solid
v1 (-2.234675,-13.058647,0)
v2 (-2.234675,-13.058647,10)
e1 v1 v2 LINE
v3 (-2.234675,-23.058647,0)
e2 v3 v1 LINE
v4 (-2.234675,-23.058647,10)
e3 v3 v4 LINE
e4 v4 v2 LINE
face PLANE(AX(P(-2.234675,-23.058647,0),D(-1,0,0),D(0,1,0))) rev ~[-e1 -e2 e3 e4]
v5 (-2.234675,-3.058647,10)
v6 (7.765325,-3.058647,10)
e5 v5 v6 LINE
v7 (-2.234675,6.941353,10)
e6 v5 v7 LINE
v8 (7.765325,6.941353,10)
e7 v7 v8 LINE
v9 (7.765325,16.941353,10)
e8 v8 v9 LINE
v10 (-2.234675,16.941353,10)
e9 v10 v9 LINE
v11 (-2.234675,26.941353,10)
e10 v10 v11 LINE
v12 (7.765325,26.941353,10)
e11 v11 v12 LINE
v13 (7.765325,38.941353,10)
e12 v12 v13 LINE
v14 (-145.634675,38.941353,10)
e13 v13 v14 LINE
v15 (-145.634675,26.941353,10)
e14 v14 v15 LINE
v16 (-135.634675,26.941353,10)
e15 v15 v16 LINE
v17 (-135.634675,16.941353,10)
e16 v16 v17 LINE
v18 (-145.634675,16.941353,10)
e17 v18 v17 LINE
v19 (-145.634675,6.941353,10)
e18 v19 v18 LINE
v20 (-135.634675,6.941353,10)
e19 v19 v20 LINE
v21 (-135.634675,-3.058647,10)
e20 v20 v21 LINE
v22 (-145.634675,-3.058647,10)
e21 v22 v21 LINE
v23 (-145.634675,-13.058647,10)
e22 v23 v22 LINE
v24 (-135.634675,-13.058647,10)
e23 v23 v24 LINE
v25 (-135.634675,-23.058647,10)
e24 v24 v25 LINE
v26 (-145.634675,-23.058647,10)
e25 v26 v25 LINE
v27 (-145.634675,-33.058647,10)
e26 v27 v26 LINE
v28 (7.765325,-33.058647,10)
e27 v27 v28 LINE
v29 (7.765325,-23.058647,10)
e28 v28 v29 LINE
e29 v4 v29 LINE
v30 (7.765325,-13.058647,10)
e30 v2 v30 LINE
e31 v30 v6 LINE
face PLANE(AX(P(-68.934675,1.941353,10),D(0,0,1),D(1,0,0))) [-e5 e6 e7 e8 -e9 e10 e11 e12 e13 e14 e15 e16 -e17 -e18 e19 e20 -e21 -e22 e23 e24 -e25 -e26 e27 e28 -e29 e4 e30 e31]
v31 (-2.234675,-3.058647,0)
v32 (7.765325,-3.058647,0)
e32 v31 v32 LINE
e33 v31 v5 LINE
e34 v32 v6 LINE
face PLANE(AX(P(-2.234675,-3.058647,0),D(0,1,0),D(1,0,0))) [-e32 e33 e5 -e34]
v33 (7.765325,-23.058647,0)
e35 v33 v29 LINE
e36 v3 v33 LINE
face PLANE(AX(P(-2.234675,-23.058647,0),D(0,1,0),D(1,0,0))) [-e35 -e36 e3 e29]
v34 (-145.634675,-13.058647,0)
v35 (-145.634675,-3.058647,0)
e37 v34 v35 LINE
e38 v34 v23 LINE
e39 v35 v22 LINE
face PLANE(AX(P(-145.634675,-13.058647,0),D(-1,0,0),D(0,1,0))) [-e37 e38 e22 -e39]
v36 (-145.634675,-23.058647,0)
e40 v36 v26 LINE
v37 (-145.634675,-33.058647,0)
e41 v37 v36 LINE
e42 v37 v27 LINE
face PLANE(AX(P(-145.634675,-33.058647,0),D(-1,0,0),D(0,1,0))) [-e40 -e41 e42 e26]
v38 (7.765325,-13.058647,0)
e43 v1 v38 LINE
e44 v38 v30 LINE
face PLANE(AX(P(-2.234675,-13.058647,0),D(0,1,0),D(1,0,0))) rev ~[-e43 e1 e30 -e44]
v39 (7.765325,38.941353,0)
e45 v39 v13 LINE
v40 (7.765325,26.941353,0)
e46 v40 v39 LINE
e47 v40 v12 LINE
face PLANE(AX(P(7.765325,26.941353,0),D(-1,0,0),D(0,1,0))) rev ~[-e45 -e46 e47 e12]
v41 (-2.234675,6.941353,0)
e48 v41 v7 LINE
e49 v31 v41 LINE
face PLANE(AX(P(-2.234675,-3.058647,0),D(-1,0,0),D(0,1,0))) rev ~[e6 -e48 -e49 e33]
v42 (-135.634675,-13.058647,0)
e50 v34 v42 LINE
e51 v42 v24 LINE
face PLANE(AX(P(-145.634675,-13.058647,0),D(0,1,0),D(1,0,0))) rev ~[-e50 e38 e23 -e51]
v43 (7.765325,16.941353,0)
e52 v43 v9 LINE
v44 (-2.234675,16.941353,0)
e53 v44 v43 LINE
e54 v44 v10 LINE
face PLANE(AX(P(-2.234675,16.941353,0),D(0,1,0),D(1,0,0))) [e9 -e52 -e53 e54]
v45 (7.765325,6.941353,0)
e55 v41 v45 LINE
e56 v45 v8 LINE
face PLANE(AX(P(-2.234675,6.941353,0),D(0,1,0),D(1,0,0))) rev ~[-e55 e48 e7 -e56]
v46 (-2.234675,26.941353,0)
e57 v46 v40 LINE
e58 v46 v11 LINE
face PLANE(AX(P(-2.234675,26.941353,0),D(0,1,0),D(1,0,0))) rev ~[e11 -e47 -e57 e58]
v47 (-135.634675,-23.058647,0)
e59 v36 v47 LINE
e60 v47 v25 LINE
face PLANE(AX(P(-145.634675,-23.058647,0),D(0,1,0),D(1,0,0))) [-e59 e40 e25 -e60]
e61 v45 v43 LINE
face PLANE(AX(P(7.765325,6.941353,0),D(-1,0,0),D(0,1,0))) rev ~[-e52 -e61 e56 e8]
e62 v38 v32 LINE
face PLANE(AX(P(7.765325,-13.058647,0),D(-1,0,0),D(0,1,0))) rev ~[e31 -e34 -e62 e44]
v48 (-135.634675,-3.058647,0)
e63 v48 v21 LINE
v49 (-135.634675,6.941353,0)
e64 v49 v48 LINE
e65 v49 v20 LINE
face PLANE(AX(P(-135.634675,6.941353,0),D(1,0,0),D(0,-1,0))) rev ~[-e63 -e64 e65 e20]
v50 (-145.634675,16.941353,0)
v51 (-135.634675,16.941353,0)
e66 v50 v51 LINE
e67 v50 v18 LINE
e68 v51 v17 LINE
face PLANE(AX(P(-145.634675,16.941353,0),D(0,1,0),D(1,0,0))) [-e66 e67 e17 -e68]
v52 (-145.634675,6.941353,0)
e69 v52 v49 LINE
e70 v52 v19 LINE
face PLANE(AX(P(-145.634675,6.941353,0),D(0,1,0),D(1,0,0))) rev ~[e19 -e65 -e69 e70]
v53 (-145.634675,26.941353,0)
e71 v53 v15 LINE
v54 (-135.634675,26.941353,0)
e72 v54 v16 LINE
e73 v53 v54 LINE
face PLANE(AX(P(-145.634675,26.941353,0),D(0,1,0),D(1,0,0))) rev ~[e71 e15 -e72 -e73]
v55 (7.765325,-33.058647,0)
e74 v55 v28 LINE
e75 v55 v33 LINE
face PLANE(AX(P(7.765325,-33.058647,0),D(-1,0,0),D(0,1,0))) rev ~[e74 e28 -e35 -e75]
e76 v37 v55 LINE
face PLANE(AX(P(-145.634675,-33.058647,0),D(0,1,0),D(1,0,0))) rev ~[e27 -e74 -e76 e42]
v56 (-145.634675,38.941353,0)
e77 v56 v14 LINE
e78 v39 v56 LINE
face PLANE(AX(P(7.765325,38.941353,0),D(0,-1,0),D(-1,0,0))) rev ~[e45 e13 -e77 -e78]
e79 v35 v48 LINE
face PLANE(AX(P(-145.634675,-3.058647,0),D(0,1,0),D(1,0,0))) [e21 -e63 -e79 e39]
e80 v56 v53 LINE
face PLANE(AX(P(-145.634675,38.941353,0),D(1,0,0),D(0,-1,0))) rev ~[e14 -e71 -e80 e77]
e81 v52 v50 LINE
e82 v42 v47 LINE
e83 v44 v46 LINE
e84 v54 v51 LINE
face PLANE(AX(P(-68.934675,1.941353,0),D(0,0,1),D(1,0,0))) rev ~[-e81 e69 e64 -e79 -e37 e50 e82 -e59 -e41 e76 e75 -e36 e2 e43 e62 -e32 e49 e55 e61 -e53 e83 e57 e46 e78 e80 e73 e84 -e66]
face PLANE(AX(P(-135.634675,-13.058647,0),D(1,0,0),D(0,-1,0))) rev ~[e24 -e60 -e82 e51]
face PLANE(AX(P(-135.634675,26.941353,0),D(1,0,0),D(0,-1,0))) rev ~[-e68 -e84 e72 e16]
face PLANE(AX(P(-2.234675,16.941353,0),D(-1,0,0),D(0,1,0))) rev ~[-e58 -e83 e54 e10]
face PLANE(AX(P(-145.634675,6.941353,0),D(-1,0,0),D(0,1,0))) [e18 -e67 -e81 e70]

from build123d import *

# Parameters (mm, degrees)
F0_W     = 10
F0_H     = 10
F1_DEPTH = 10


# Not quite as in the source:
# - a feature names something its author has since deleted; it is built from what else it names


with BuildPart() as f1:
    # F0 (on Top) → F1 (new body)
    with BuildSketch(Plane.XY):
        Polygon((-2.2346749902, 36.9413525529), (-135.6346749902, 36.9413525529), (-135.6346749902, 26.9413525529), (-135.6346749902, 16.9413525529), (-135.6346749902, 6.9413525529), (-135.6346749902, -3.0586474471), (-135.6346749902, -13.0586474471), (-135.6346749902, -23.0586474471), (-135.6346749902, -33.0586474471), (-2.2346749902, -33.0586474471), (-2.2346749902, -23.0586474471), (-2.2346749902, -13.0586474471), (-2.2346749902, -3.0586474471), (-2.2346749902, 6.9413525529), (-2.2346749902, 16.9413525529), (-2.2346749902, 26.9413525529), align=None)
        with Locations((-140.6346749902, 31.9413525529)):
            Rectangle(F0_W, F0_H)
        with Locations((-140.6346749902, 11.9413525529)):
            Rectangle(F0_W, F0_H)
        with Locations((-140.6346749902, -8.0586474471)):
            Rectangle(F0_W, F0_H)
        with Locations((-140.6346749902, -28.0586474471)):
            Rectangle(F0_W, F0_H)
        with Locations((2.7653250098, 31.9413525529)):
            Rectangle(F0_W, F0_H)
        with Locations((2.7653250098, 11.9413525529)):
            Rectangle(F0_W, F0_H)
        with Locations((2.7653250098, -8.0586474471)):
            Rectangle(F0_W, F0_H)
        with Locations((2.7653250098, -28.0586474471)):
            Rectangle(F0_W, F0_H)
        Polygon((-145.6346749902, 38.9413525529), (-145.6346749902, 36.9413525529), (-135.6346749902, 36.9413525529), (-2.2346749902, 36.9413525529), (7.7653250098, 36.9413525529), (7.7653250098, 38.9413525529), align=None)
    extrude(amount=F1_DEPTH)


solid = f1.part
